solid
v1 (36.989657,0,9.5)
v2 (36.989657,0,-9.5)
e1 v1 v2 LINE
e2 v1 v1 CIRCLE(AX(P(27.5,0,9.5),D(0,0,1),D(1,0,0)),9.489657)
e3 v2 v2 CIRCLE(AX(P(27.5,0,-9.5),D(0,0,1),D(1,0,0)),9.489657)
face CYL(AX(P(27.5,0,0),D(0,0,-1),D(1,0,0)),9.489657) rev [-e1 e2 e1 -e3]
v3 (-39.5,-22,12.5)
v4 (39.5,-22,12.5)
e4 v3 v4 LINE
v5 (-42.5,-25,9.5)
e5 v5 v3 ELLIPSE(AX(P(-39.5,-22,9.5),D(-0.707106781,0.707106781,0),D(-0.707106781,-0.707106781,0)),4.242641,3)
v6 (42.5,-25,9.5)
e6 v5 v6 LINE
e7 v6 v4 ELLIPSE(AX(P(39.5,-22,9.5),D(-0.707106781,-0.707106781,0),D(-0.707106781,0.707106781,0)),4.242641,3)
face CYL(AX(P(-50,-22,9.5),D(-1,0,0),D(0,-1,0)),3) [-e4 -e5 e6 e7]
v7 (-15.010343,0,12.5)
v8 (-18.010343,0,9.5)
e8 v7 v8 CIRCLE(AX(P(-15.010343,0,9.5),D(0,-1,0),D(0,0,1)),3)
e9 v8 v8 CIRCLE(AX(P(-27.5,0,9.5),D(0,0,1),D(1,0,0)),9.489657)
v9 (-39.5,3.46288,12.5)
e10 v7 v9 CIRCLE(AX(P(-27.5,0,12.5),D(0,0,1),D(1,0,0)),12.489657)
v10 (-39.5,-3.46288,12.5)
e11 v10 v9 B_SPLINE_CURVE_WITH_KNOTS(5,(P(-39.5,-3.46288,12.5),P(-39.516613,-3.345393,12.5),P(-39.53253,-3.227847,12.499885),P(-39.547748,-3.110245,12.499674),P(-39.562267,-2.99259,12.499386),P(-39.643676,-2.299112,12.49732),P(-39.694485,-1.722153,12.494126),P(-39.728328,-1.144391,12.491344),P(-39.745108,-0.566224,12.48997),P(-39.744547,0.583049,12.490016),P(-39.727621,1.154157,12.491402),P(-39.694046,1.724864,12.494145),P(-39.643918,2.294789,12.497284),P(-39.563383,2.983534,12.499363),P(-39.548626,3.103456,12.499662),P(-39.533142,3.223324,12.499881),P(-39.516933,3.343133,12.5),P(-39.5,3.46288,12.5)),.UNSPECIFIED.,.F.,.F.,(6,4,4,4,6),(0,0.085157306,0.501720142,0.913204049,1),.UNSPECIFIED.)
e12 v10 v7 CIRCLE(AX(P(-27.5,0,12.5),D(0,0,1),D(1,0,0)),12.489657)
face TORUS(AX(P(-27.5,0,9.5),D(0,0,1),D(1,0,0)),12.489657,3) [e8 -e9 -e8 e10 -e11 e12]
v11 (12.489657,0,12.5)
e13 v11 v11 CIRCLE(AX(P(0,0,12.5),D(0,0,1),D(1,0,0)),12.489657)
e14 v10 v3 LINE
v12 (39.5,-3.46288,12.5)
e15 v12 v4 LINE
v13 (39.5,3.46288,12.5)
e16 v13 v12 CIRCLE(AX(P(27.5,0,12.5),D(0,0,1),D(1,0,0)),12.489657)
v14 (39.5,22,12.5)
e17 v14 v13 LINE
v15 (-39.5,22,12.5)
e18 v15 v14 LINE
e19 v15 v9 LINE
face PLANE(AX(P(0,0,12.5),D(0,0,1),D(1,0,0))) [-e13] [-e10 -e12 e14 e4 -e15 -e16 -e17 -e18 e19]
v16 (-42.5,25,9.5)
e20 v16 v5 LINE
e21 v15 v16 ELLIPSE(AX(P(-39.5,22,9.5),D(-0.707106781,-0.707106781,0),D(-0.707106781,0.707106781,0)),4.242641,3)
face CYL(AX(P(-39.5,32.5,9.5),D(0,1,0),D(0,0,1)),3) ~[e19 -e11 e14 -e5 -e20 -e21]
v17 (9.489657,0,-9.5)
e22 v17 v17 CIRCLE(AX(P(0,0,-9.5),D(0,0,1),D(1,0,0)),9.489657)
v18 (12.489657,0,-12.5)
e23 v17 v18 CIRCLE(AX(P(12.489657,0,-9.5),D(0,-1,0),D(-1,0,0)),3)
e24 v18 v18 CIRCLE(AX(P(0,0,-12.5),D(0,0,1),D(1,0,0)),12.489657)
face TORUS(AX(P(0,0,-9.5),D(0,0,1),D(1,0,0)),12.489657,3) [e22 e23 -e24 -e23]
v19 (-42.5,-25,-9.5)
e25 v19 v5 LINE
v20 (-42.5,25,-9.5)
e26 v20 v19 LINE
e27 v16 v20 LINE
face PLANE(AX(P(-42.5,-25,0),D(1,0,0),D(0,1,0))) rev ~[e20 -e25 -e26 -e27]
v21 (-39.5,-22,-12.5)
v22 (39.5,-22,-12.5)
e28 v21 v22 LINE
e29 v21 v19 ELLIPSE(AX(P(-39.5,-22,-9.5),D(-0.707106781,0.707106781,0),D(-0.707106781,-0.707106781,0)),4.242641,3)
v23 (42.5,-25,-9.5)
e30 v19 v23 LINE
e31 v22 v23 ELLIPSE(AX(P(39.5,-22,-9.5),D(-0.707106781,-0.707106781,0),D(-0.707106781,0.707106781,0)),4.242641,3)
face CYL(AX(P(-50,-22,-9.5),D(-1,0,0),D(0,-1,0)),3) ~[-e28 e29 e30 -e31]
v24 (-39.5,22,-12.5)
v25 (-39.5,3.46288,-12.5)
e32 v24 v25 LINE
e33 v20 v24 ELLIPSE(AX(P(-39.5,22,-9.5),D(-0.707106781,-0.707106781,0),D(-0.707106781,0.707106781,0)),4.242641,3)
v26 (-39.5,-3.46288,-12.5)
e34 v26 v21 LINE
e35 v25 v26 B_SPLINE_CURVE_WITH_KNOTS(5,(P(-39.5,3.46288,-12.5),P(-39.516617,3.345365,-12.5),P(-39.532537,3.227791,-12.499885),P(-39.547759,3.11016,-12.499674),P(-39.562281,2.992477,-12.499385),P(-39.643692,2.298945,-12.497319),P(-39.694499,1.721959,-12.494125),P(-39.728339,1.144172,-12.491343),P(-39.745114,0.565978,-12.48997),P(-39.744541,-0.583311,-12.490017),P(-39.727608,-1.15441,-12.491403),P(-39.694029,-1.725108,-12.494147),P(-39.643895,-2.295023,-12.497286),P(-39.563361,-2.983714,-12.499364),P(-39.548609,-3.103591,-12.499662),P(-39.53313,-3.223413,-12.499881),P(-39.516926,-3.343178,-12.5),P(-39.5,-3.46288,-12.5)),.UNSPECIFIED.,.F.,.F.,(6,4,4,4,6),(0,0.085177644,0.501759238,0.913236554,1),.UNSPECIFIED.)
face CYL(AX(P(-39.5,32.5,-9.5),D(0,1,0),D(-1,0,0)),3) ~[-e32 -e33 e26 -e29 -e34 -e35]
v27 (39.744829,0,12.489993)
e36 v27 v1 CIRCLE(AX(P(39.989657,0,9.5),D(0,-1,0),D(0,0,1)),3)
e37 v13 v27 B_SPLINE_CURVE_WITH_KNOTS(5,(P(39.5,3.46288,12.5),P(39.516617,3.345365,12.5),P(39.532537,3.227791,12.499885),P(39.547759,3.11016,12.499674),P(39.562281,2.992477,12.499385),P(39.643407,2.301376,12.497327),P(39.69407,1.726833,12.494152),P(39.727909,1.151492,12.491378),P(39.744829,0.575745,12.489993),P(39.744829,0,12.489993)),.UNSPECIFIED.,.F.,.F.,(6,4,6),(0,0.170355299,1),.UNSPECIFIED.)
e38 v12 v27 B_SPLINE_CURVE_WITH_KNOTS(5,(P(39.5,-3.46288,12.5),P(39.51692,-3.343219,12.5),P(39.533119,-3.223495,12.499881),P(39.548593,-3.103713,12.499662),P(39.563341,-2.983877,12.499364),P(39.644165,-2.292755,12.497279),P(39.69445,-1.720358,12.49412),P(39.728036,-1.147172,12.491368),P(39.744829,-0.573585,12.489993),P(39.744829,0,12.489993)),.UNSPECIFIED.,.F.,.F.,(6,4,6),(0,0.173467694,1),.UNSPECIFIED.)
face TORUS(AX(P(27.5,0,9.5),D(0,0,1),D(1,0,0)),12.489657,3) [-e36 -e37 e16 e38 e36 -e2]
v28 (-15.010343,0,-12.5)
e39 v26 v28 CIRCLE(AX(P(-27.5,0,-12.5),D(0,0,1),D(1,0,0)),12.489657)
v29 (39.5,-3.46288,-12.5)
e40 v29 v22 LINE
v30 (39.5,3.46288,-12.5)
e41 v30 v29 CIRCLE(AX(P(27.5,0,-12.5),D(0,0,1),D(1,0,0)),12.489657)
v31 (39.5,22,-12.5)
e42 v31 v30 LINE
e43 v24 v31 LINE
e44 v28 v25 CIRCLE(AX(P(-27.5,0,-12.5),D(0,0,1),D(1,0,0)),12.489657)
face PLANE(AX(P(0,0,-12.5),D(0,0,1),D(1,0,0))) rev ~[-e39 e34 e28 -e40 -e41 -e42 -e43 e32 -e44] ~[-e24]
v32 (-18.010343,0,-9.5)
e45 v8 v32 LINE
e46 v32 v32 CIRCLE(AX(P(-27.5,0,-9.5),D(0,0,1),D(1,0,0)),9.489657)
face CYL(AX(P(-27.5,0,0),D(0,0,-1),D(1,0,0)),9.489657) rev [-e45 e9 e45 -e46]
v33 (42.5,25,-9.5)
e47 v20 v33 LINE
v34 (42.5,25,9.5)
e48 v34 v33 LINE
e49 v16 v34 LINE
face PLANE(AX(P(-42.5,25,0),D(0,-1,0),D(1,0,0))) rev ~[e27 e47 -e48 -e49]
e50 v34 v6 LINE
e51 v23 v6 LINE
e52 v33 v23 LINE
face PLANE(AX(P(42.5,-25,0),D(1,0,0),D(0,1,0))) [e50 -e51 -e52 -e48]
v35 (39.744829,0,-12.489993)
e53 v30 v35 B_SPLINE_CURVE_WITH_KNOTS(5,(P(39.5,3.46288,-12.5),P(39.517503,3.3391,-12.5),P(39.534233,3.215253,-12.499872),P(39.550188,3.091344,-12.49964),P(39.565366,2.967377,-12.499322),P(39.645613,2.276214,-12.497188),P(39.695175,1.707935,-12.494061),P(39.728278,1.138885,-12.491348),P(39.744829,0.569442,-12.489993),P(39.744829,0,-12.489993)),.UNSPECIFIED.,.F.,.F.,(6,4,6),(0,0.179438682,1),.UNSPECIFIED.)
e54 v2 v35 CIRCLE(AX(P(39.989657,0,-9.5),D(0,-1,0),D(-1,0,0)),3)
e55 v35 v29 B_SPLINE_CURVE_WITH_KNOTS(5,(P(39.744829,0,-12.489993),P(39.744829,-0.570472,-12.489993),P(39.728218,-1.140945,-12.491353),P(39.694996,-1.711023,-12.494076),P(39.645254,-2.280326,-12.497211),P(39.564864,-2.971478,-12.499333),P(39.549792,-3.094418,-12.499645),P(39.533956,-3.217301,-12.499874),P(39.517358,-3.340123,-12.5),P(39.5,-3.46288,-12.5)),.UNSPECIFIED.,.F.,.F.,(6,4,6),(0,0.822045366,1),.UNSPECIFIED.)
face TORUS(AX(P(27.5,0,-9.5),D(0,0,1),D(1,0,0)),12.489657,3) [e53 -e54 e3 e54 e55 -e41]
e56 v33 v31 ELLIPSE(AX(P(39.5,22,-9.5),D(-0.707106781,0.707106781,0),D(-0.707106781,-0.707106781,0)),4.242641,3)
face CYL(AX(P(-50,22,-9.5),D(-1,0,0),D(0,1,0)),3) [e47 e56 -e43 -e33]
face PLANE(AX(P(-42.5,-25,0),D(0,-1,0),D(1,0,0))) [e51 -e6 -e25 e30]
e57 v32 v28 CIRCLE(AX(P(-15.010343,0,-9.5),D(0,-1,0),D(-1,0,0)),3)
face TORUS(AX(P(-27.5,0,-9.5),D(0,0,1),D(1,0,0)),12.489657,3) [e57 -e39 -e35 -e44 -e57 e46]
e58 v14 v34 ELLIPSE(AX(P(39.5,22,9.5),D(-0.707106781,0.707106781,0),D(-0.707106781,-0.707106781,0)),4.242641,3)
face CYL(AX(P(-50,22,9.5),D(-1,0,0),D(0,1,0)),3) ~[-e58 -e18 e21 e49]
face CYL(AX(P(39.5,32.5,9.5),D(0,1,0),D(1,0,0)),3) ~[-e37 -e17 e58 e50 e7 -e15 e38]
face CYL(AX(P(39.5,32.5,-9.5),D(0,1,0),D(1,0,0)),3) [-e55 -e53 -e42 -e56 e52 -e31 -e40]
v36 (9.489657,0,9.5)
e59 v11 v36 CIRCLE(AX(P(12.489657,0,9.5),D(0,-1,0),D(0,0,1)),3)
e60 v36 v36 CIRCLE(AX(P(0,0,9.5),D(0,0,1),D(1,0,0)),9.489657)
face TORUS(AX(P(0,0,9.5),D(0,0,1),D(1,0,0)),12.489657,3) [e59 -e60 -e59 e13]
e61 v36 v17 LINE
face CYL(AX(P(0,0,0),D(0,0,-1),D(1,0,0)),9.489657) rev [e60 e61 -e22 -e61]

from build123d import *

# Parameters (mm, degrees)
F0_W        = 85
F0_H        = 50
F0_R        = 9.4896573641
F1_DEPTH    = 12.5
F2_T1_DEPTH = 100
F2_T3_DEPTH = 65


# Not quite as in the source:
# - a fillet or chamfer that OpenCascade refuses, or shapes differently, is made with other operations: its cross-section is extruded or revolved along the edge and cut away or added


with BuildPart() as f1:
    # F0 (on Top) → F1 (new body, symmetric)
    with BuildSketch(Plane.XY):
        Rectangle(F0_W, F0_H)
        with Locations((-27.5, 0)):
            Circle(F0_R, mode=Mode.SUBTRACT)
        Circle(F0_R, mode=Mode.SUBTRACT)
        with Locations((27.5, 0)):
            Circle(F0_R, mode=Mode.SUBTRACT)
    extrude(amount=F1_DEPTH, both=True)

    # F2: fillet of radius 3 on 14 edges, made by hand

    # F2_s2 → F2_t1 (cut)
    with BuildSketch(Plane.YZ.offset(-50)):
        with BuildLine():
            ThreePointArc((25, -9.5), (24.1213203436, -11.6213203436), (22, -12.5))
            Line((22, -12.5), (25, -12.5))
            Line((25, -12.5), (25, -9.5))
        make_face()
        with BuildLine():
            ThreePointArc((-25, -9.5), (-24.1213203436, -11.6213203436), (-22, -12.5))
            Line((-22, -12.5), (-25, -12.5))
            Line((-25, -12.5), (-25, -9.5))
        make_face()
        with BuildLine():
            ThreePointArc((25, 9.5), (24.1213203436, 11.6213203436), (22, 12.5))
            Line((22, 12.5), (25, 12.5))
            Line((25, 12.5), (25, 9.5))
        make_face()
        with BuildLine():
            ThreePointArc((-25, 9.5), (-24.1213203436, 11.6213203436), (-22, 12.5))
            Line((-22, 12.5), (-25, 12.5))
            Line((-25, 12.5), (-25, 9.5))
        make_face()
    extrude(amount=F2_T1_DEPTH, mode=Mode.SUBTRACT)

    # F2_s4 → F2_t3 (cut)
    with BuildSketch(Plane.XZ.offset(-32.5)):
        with BuildLine():
            ThreePointArc((-42.5, -9.5), (-41.6213203436, -11.6213203436), (-39.5, -12.5))
            Line((-39.5, -12.5), (-42.5, -12.5))
            Line((-42.5, -12.5), (-42.5, -9.5))
        make_face()
        with BuildLine():
            ThreePointArc((42.5, -9.5), (41.6213203436, -11.6213203436), (39.5, -12.5))
            Line((39.5, -12.5), (42.5, -12.5))
            Line((42.5, -12.5), (42.5, -9.5))
        make_face()
        with BuildLine():
            ThreePointArc((-39.5, 12.5), (-41.6213203436, 11.6213203436), (-42.5, 9.5))
            Line((-42.5, 9.5), (-42.5, 12.5))
            Line((-42.5, 12.5), (-39.5, 12.5))
        make_face()
        with BuildLine():
            ThreePointArc((42.5, 9.5), (41.6213203436, 11.6213203436), (39.5, 12.5))
            Line((39.5, 12.5), (42.5, 12.5))
            Line((42.5, 12.5), (42.5, 9.5))
        make_face()
    extrude(amount=F2_T3_DEPTH, mode=Mode.SUBTRACT)

    # F2_s5 → F2_t6 (revolve, cut)
    with BuildSketch(Plane.XZ):
        with BuildLine():
            ThreePointArc((36.9896573641, -9.5), (37.8683370205, -11.6213203436), (39.9896573641, -12.5))
            Line((39.9896573641, -12.5), (36.9896573641, -12.5))
            Line((36.9896573641, -12.5), (36.9896573641, -9.5))
        make_face()
    revolve(axis=Axis((27.5, 0, -12.5), (0, 0, 1)), mode=Mode.SUBTRACT)

    # F2_s7 → F2_t8 (revolve, cut)
    with BuildSketch(Plane.XZ):
        with BuildLine():
            ThreePointArc((9.4896573641, -9.5), (10.3683370205, -11.6213203436), (12.4896573641, -12.5))
            Line((12.4896573641, -12.5), (9.4896573641, -12.5))
            Line((9.4896573641, -12.5), (9.4896573641, -9.5))
        make_face()
    revolve(axis=Axis((0, 0, -12.5), (0, 0, 1)), mode=Mode.SUBTRACT)

    # F2_s9 → F2_t10 (revolve, cut)
    with BuildSketch(Plane.XZ):
        with BuildLine():
            ThreePointArc((-18.0103426359, -9.5), (-17.1316629795, -11.6213203436), (-15.0103426359, -12.5))
            Line((-15.0103426359, -12.5), (-18.0103426359, -12.5))
            Line((-18.0103426359, -12.5), (-18.0103426359, -9.5))
        make_face()
    revolve(axis=Axis((-27.5, 0, -12.5), (0, 0, 1)), mode=Mode.SUBTRACT)

    # F2_s11 → F2_t12 (revolve, cut)
    with BuildSketch(Plane.XZ):
        with BuildLine():
            ThreePointArc((39.9896573641, 12.5), (37.8683370205, 11.6213203436), (36.9896573641, 9.5))
            Line((36.9896573641, 9.5), (36.9896573641, 12.5))
            Line((36.9896573641, 12.5), (39.9896573641, 12.5))
        make_face()
    revolve(axis=Axis((27.5, 0, 12.5), (0, 0, 1)), mode=Mode.SUBTRACT)

    # F2_s13 → F2_t14 (revolve, cut)
    with BuildSketch(Plane.XZ):
        with BuildLine():
            ThreePointArc((12.4896573641, 12.5), (10.3683370205, 11.6213203436), (9.4896573641, 9.5))
            Line((9.4896573641, 9.5), (9.4896573641, 12.5))
            Line((9.4896573641, 12.5), (12.4896573641, 12.5))
        make_face()
    revolve(axis=Axis((0, 0, 12.5), (0, 0, 1)), mode=Mode.SUBTRACT)

    # F2_s15 → F2_t16 (revolve, cut)
    with BuildSketch(Plane.XZ):
        with BuildLine():
            ThreePointArc((-15.0103426359, 12.5), (-17.1316629795, 11.6213203436), (-18.0103426359, 9.5))
            Line((-18.0103426359, 9.5), (-18.0103426359, 12.5))
            Line((-18.0103426359, 12.5), (-15.0103426359, 12.5))
        make_face()
    revolve(axis=Axis((-27.5, 0, 12.5), (0, 0, 1)), mode=Mode.SUBTRACT)


solid = f1.part
